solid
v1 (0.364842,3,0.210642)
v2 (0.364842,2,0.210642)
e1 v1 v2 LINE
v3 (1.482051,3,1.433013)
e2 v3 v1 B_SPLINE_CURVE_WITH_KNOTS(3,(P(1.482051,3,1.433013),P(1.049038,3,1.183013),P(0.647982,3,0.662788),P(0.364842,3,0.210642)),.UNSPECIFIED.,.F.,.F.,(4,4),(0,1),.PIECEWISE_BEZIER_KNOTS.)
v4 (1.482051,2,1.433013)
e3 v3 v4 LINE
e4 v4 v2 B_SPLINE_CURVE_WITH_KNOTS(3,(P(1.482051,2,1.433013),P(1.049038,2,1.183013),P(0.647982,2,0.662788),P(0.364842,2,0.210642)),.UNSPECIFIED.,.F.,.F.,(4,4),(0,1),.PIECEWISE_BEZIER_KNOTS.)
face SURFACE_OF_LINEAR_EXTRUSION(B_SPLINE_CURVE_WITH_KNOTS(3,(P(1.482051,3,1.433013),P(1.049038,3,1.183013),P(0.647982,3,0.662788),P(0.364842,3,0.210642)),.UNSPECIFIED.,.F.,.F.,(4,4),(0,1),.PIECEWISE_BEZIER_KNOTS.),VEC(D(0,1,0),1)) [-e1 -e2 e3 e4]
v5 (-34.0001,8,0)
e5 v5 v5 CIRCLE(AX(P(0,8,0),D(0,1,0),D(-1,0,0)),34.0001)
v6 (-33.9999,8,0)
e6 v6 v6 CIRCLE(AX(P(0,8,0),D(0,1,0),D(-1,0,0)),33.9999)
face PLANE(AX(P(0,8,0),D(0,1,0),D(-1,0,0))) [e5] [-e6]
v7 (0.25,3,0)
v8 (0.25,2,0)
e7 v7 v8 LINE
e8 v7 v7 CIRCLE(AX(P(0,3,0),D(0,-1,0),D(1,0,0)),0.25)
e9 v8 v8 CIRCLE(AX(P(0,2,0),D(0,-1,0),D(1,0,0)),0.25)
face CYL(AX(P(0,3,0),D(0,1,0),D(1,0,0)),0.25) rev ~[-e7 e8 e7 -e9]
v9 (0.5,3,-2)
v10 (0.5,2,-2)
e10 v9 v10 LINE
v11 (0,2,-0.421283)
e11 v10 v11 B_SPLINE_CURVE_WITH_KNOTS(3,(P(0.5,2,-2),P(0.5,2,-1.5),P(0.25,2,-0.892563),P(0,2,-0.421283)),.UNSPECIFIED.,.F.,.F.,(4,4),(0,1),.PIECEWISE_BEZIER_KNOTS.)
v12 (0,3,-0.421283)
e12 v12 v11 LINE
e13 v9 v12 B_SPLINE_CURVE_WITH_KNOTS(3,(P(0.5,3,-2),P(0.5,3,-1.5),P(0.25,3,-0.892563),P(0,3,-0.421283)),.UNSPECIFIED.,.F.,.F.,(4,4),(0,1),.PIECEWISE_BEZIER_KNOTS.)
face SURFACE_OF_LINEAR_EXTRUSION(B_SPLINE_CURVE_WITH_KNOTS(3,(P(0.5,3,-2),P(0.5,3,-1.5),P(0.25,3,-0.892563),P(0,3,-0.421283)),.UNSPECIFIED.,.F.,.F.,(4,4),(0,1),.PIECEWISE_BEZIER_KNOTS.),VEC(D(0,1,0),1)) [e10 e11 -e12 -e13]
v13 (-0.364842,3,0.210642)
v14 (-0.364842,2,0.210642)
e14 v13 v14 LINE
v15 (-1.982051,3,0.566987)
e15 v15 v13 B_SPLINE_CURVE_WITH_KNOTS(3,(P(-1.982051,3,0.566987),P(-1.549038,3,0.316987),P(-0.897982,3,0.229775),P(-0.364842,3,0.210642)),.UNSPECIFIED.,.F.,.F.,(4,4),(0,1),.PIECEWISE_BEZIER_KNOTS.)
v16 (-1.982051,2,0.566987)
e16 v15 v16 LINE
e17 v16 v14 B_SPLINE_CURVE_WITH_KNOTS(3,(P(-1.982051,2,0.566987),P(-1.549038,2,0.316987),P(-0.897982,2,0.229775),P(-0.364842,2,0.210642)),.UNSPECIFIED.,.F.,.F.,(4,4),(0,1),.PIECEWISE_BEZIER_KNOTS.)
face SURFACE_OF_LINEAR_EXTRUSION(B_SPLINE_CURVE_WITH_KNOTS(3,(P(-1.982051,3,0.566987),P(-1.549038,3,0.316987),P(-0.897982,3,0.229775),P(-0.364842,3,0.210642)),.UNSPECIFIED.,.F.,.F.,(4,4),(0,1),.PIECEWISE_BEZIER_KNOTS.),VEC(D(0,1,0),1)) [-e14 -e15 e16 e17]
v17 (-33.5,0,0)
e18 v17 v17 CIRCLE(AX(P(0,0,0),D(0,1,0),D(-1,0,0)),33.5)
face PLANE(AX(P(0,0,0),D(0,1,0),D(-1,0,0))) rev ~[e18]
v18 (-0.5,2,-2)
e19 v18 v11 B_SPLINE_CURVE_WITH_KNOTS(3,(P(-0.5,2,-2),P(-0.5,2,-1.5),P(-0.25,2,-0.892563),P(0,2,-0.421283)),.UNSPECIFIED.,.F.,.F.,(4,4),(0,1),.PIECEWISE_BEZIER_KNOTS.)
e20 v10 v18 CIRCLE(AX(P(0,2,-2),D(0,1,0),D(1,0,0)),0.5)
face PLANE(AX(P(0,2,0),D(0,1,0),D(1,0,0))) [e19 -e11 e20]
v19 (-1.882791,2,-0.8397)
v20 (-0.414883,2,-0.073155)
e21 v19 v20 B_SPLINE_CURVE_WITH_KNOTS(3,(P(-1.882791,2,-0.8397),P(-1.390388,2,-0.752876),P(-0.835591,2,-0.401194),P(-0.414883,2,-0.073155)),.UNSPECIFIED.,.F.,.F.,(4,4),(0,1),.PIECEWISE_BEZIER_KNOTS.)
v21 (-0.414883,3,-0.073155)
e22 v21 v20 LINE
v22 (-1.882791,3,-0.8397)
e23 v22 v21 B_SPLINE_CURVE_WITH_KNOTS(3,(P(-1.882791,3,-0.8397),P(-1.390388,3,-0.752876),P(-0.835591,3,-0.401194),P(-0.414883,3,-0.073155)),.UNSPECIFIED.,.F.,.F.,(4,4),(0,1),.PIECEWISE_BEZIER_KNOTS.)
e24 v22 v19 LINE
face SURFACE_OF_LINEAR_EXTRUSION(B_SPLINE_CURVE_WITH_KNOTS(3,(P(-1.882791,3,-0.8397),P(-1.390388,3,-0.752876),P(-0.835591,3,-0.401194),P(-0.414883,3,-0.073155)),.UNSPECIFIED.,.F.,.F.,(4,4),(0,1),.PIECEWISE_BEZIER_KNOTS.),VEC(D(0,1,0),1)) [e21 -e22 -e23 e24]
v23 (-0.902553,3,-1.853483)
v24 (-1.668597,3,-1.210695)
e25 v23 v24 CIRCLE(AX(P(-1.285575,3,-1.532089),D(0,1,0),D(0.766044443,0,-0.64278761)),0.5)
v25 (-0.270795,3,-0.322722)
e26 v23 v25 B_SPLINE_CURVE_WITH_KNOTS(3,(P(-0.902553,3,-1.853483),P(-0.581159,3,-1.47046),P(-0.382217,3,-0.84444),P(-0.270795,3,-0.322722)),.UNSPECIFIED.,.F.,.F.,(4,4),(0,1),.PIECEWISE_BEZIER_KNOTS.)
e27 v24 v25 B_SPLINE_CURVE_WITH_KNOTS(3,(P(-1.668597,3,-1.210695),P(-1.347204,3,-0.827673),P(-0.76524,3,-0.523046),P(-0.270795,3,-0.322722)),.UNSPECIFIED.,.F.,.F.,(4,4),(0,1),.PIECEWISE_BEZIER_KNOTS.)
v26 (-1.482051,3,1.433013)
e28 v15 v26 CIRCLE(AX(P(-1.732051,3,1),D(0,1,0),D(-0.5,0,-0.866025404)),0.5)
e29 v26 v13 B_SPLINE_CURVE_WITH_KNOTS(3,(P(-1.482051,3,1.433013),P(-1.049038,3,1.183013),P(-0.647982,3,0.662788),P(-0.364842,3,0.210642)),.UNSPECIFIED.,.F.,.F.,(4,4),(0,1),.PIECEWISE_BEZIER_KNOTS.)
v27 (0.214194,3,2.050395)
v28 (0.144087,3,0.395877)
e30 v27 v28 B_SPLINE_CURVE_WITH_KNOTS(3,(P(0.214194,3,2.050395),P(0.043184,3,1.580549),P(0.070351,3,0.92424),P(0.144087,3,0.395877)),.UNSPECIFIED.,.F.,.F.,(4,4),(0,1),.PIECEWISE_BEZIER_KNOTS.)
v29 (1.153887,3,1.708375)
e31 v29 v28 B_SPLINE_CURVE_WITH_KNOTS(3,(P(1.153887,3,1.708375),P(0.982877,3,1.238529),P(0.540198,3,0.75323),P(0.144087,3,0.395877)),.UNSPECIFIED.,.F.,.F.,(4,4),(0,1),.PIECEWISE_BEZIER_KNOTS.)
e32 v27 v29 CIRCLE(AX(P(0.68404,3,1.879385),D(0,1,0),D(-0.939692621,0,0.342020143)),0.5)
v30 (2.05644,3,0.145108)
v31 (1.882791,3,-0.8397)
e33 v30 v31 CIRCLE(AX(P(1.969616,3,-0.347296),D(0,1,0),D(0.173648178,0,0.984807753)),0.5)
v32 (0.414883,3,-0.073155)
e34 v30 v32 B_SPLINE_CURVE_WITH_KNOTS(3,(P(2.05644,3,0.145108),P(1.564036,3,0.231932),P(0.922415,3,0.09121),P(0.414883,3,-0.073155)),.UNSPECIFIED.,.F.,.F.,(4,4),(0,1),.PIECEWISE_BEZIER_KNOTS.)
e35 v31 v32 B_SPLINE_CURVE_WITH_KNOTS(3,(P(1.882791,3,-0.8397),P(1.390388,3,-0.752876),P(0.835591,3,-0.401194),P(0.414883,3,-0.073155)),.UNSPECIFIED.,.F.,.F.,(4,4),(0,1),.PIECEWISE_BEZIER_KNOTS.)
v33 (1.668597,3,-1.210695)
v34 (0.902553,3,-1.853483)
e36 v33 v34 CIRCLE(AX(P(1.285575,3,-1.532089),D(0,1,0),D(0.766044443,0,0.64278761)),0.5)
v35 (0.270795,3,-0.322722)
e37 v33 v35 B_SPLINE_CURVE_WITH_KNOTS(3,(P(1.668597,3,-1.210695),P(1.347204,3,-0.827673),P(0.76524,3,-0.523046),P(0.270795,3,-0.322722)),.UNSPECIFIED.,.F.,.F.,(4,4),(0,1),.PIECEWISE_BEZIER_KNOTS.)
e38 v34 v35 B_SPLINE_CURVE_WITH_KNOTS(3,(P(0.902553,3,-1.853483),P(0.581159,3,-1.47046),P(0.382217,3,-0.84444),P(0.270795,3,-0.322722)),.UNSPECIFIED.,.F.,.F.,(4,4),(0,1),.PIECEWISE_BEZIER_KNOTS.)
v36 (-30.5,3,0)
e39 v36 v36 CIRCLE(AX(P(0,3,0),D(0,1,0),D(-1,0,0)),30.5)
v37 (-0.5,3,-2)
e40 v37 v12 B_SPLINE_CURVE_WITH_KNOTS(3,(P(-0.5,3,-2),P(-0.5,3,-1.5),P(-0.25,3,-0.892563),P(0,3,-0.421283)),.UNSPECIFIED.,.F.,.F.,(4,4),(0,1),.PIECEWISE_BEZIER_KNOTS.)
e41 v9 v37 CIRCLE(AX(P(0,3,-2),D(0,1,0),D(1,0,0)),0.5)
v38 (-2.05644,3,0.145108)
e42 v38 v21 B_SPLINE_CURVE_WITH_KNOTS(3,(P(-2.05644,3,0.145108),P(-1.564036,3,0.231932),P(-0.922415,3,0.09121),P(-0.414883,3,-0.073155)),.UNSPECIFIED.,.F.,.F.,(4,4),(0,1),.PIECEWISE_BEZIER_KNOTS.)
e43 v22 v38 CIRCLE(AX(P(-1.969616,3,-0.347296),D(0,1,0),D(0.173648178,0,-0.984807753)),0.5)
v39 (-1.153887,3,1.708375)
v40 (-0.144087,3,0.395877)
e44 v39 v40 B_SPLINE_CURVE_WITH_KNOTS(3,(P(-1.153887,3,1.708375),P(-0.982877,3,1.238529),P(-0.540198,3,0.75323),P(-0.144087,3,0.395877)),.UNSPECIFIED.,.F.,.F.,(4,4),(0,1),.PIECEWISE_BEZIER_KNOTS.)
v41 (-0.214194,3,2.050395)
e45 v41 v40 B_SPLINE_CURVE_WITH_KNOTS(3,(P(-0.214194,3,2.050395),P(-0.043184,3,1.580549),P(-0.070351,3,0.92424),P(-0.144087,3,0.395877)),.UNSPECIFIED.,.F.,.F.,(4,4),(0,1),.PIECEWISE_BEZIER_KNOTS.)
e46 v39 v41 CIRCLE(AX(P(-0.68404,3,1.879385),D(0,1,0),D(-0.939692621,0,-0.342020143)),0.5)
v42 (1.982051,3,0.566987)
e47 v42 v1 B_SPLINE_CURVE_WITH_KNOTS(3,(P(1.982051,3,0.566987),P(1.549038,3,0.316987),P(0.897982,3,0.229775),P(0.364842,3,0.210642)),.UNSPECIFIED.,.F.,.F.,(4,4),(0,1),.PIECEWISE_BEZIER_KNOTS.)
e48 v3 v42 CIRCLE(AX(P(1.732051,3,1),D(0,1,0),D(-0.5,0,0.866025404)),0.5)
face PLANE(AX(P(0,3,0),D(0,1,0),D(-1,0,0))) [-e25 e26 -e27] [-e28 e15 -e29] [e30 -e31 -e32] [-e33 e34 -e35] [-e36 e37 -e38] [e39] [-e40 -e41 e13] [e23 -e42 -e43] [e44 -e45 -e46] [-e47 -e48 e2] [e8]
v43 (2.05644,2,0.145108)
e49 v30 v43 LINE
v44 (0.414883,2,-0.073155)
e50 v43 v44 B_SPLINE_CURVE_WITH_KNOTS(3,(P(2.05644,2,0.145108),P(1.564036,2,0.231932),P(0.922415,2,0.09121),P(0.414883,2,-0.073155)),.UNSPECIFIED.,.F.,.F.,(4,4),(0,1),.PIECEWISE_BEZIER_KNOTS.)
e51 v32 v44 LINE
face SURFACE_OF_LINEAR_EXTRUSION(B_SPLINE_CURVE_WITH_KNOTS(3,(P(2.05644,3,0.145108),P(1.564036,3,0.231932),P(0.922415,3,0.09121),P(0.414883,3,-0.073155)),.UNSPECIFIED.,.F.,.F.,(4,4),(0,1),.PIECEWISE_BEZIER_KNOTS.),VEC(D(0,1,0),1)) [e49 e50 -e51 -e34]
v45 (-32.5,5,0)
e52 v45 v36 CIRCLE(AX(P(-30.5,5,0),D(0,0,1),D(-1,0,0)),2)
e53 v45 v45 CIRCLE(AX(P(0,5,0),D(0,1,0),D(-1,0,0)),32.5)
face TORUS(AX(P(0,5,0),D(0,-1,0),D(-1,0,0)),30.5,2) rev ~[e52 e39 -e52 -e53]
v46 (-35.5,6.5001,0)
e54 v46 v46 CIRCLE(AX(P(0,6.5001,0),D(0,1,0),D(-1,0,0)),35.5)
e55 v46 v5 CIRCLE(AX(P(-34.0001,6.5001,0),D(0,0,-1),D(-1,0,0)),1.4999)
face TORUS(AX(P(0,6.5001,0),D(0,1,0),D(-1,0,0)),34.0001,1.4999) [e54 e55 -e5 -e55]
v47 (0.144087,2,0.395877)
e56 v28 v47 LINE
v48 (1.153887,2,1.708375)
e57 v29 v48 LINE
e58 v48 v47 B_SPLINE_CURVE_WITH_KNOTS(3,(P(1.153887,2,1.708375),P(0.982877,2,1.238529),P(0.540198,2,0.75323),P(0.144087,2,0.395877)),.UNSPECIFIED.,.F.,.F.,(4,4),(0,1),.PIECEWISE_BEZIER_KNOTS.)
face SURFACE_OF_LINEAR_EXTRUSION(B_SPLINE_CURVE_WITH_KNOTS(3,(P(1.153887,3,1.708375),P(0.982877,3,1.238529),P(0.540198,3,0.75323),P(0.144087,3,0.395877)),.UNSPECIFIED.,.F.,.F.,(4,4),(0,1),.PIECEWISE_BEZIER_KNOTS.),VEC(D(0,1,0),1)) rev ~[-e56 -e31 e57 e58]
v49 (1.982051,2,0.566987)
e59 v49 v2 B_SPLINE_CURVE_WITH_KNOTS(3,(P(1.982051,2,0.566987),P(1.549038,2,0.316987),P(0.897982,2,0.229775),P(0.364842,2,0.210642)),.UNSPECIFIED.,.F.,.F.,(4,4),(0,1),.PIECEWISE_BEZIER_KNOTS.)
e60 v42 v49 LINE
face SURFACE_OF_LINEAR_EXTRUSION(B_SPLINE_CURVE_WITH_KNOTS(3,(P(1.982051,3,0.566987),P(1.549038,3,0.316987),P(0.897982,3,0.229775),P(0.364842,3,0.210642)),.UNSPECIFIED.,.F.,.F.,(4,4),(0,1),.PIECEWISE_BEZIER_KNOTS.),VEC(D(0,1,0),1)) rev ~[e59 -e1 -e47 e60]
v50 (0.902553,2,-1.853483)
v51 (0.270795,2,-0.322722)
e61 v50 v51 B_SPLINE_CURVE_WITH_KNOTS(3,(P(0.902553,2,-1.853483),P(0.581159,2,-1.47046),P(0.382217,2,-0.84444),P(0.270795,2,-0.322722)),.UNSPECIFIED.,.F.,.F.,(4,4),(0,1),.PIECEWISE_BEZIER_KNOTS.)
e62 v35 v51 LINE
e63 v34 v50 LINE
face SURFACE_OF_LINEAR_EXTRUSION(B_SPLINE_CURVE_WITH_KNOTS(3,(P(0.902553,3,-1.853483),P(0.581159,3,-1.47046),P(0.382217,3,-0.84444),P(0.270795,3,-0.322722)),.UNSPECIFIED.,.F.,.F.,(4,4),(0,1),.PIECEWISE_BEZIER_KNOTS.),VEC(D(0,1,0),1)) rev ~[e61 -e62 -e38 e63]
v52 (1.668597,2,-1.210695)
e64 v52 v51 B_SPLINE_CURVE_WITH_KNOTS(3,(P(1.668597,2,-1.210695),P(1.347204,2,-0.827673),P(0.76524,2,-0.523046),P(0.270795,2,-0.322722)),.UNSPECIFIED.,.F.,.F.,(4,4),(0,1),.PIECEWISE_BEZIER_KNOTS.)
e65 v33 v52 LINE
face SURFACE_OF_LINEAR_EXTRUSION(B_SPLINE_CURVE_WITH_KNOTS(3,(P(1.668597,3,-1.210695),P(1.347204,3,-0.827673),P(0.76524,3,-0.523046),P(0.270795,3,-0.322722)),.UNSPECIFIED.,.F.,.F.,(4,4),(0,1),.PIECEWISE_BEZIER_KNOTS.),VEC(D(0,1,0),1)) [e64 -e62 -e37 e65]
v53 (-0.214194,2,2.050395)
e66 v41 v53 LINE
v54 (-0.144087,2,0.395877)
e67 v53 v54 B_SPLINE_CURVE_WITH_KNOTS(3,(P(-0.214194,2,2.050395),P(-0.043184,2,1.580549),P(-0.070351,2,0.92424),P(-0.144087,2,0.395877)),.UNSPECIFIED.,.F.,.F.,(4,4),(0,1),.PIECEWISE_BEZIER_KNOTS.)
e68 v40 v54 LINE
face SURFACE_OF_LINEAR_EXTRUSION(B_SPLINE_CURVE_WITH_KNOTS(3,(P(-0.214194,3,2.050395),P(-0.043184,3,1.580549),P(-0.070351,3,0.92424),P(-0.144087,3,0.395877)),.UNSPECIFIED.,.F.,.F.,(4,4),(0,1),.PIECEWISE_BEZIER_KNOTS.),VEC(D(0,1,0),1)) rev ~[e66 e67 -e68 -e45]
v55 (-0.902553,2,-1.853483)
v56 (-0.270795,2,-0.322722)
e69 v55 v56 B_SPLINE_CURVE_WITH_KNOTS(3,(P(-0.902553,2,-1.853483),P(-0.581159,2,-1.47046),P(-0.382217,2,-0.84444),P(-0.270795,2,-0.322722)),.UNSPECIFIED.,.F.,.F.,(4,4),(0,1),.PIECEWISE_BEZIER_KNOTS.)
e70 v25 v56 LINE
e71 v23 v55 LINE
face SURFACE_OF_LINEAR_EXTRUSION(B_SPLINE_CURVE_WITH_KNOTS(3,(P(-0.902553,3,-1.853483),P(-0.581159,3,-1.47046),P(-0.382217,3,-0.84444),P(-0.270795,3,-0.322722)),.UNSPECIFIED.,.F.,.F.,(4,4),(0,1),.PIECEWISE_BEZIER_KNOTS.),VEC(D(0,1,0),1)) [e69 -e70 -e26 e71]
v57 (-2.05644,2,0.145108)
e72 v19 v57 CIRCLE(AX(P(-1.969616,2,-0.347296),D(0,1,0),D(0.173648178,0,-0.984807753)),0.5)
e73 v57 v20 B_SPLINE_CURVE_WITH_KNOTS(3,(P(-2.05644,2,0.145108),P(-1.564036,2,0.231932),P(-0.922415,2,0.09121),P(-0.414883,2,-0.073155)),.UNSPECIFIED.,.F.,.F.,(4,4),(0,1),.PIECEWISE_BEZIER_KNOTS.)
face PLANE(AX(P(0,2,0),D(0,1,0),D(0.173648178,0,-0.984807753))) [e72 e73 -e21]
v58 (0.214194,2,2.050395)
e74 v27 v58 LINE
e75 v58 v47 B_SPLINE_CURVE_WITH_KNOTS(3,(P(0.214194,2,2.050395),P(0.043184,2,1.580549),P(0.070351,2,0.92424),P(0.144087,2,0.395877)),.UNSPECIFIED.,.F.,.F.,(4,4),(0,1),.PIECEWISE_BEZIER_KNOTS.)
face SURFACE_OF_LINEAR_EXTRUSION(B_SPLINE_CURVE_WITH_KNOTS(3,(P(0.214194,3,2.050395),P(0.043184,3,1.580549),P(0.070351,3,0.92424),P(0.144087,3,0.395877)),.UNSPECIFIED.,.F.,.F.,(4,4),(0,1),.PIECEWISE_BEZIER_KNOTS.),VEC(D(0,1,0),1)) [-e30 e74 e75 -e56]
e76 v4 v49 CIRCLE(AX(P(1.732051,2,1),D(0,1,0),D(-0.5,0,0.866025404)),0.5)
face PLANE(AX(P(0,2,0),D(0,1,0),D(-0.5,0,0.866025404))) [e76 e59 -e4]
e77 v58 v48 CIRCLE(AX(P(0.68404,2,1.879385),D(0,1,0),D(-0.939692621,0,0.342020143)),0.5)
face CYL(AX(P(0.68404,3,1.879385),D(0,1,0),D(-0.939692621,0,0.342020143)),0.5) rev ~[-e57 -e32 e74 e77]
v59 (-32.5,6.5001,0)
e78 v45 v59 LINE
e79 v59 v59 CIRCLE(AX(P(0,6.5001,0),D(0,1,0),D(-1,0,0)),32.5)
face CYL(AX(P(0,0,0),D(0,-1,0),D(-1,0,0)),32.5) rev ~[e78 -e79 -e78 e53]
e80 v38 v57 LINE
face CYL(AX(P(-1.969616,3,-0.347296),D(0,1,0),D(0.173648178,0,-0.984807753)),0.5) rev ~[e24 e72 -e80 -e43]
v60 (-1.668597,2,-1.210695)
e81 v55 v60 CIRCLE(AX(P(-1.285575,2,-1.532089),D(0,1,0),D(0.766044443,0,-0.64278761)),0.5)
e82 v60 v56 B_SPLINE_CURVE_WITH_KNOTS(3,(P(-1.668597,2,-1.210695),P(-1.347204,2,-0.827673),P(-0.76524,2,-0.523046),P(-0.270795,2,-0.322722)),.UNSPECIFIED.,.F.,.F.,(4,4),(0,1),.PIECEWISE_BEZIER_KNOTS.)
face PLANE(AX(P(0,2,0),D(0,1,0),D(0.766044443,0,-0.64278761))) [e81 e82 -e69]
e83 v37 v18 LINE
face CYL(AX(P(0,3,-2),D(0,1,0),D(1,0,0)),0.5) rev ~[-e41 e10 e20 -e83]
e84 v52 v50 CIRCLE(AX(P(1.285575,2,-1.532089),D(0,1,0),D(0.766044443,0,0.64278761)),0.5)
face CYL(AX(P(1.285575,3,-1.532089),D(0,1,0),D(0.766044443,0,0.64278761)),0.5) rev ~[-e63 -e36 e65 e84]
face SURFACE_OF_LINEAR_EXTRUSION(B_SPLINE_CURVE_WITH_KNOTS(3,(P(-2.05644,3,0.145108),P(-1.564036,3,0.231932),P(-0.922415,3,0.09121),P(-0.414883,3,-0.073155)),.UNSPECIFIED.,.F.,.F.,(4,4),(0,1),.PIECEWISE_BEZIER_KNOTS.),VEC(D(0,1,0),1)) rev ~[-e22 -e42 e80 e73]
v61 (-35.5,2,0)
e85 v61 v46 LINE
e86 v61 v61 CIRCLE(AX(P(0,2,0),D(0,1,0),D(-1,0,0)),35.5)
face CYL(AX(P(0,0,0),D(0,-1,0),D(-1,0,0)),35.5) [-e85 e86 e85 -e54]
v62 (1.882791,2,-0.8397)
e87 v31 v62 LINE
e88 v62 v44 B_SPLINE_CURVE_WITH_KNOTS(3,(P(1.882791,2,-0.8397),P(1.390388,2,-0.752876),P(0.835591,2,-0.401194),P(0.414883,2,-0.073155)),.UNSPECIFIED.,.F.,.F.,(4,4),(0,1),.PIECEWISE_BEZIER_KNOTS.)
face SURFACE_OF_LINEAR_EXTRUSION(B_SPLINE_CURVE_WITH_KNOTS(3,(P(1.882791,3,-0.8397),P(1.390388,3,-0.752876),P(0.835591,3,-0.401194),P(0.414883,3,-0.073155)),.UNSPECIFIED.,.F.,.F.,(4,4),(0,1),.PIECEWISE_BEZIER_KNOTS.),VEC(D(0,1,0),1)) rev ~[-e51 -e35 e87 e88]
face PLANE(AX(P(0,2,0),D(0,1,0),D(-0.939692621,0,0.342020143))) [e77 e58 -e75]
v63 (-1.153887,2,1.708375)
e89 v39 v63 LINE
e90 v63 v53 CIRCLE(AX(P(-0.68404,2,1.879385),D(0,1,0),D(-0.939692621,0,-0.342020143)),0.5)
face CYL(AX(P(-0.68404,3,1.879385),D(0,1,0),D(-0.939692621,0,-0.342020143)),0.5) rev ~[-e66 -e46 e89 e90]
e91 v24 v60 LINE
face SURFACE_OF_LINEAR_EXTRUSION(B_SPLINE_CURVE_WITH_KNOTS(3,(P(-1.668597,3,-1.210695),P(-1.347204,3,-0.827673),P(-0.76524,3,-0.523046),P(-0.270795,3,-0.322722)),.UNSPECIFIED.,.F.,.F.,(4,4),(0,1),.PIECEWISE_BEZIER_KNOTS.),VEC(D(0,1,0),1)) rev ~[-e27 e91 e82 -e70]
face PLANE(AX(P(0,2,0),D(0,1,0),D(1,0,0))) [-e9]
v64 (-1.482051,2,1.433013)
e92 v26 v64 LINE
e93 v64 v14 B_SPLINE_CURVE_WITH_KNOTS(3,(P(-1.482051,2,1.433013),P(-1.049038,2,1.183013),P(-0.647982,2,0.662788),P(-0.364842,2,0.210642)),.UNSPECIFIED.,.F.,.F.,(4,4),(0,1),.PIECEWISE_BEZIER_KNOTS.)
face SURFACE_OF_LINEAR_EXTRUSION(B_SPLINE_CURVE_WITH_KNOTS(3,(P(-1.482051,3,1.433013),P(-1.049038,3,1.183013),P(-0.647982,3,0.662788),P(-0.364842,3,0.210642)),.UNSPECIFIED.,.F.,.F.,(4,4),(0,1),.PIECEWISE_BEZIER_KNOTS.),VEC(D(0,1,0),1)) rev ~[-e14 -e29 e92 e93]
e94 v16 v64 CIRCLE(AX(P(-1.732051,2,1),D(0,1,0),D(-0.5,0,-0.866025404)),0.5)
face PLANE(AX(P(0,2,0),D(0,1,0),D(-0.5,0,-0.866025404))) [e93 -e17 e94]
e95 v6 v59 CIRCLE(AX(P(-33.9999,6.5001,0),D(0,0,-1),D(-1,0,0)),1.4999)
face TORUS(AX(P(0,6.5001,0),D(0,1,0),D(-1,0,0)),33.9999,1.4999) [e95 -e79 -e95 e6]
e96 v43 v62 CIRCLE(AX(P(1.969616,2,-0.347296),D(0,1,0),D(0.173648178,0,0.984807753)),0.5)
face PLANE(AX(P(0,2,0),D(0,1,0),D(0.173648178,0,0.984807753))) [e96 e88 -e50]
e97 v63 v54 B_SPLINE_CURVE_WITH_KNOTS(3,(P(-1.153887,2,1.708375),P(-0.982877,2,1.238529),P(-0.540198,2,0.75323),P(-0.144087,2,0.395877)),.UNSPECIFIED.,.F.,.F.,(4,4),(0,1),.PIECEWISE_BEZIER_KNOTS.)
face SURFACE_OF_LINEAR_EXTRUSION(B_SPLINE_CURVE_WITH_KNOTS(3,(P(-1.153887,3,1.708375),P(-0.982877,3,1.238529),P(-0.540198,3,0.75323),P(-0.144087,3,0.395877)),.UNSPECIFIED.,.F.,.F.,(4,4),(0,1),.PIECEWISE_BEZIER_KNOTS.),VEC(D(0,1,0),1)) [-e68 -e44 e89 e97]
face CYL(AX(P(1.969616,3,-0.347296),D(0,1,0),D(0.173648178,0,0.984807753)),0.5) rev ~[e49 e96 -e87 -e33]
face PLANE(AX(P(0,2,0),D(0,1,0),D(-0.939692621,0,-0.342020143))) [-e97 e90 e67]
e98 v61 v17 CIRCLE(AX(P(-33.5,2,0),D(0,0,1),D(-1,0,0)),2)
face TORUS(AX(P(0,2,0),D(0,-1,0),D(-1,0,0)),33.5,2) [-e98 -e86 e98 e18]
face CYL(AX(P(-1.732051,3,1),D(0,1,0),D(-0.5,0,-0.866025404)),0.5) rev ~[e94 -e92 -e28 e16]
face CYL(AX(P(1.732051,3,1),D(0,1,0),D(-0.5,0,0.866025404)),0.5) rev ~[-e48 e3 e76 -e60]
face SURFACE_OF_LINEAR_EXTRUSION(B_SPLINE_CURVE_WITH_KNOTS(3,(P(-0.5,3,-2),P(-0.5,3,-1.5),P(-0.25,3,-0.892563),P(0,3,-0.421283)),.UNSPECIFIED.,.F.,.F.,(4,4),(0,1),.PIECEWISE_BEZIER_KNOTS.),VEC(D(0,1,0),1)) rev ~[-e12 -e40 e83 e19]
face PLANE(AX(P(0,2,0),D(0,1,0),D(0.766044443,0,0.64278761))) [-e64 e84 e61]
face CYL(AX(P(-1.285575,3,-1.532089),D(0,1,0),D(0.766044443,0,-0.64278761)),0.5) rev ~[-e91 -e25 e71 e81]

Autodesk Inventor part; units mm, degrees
ref_plane "YZ Plane" through (0, 0, 0) normal (1, 0, 0) x (0, 1, 0)
ref_plane "XZ Plane" through (0, 0, 0) normal (0, 1, 0) x (-1, 0, 0)
ref_plane "XY Plane" through (0, 0, 0) normal (0, 0, 1) x (1, 0, 0)
sketch "Sketch1" plane through (0, 0, 0) normal (0, 1, 0) x (-1, 0, 0)
  circle A0 centre (0, 0) radius 32.5
  circle A1 centre (0, 0) radius 35.5
  dimension "d0" = 65
  dimension "d1" = 71
extrude "Extrusion1" add sketch "Sketch1" along normal blind 8
extrude "Extrusion2" add sketch "Sketch1" along normal blind 3 contours A0
fillet "Fillet1" radius 2 2 edges at (35.5, 0, 0) (32.5, 3, 0)
fillet "Fillet2" radius 1.5 2 edges at (32.5, 8, 0) (35.5, 8, 0)
sketch "Sketch2" plane through (0, 3, 0) normal (0, 1, 0) x (1, 0, 0)
  circle A0 centre (0, 0) radius 0.25
  circle A1 centre (0, 0) radius 2.5
  circle A2 centre (0, 2) radius 0.5
  line L0 (-0.5, 2) -> (-0.5, 1.5) construction
  line L1 (-0.5, 1.5) -> (-0.25, 0.892563) construction
  line L2 (-0.25, 0.892563) -> (0, 0.421283) construction
  spline S0 degree 3 poles (-0.5, 2) (-0.5, 1.5) (-0.25, 0.892563) (0, 0.421283) knots 1 1 1 1 2 2 2 2
  line L3 (-0.5, 1.5) -> (0.5, 1.5)
  line L4 (-0.25, 0.892563) -> (0.25, 0.892563)
  line L5 (0.5, 2) -> (0.5, 1.5) construction
  line L6 (0.5, 1.5) -> (0.25, 0.892563) construction
  line L7 (0.25, 0.892563) -> (0, 0.421283) construction
  spline S1 degree 3 poles (0.5, 2) (0.5, 1.5) (0.25, 0.892563) (0, 0.421283) knots 1 1 1 1 2 2 2 2
  dimension "d12" = 0.5
  dimension "d13" = 5
sketch "Sketch2 outline for Extrusion4" plane through (0, 3, 0) normal (0, 1, 0) x (1, 0, 0)
  circle A0 centre (0, 0) radius 0.25
  spline S0 degree 3 poles (0.5, 2) (0.5, 1.5) (0.25, 0.892563) (0, 0.421283) knots 0 0 0 0 1 1 1 1
  spline S1 degree 3 poles (-0.5, 2) (-0.5, 1.5) (-0.25, 0.892563) (0, 0.421283) knots 0 0 0 0 1 1 1 1
  arc A1 (0.5, 2) -> (-0.5, 2) centre (0, 2) ccw
extrude "Extrusion4" cut sketch "Sketch2 outline for Extrusion4" against normal blind 1
pattern_circular "Circular Pattern1" count 9 over 360 about axis through (0, -10, 0) along (0, 1, 0) of "Extrusion4"
properties part number "Orchid Coaster V4"
